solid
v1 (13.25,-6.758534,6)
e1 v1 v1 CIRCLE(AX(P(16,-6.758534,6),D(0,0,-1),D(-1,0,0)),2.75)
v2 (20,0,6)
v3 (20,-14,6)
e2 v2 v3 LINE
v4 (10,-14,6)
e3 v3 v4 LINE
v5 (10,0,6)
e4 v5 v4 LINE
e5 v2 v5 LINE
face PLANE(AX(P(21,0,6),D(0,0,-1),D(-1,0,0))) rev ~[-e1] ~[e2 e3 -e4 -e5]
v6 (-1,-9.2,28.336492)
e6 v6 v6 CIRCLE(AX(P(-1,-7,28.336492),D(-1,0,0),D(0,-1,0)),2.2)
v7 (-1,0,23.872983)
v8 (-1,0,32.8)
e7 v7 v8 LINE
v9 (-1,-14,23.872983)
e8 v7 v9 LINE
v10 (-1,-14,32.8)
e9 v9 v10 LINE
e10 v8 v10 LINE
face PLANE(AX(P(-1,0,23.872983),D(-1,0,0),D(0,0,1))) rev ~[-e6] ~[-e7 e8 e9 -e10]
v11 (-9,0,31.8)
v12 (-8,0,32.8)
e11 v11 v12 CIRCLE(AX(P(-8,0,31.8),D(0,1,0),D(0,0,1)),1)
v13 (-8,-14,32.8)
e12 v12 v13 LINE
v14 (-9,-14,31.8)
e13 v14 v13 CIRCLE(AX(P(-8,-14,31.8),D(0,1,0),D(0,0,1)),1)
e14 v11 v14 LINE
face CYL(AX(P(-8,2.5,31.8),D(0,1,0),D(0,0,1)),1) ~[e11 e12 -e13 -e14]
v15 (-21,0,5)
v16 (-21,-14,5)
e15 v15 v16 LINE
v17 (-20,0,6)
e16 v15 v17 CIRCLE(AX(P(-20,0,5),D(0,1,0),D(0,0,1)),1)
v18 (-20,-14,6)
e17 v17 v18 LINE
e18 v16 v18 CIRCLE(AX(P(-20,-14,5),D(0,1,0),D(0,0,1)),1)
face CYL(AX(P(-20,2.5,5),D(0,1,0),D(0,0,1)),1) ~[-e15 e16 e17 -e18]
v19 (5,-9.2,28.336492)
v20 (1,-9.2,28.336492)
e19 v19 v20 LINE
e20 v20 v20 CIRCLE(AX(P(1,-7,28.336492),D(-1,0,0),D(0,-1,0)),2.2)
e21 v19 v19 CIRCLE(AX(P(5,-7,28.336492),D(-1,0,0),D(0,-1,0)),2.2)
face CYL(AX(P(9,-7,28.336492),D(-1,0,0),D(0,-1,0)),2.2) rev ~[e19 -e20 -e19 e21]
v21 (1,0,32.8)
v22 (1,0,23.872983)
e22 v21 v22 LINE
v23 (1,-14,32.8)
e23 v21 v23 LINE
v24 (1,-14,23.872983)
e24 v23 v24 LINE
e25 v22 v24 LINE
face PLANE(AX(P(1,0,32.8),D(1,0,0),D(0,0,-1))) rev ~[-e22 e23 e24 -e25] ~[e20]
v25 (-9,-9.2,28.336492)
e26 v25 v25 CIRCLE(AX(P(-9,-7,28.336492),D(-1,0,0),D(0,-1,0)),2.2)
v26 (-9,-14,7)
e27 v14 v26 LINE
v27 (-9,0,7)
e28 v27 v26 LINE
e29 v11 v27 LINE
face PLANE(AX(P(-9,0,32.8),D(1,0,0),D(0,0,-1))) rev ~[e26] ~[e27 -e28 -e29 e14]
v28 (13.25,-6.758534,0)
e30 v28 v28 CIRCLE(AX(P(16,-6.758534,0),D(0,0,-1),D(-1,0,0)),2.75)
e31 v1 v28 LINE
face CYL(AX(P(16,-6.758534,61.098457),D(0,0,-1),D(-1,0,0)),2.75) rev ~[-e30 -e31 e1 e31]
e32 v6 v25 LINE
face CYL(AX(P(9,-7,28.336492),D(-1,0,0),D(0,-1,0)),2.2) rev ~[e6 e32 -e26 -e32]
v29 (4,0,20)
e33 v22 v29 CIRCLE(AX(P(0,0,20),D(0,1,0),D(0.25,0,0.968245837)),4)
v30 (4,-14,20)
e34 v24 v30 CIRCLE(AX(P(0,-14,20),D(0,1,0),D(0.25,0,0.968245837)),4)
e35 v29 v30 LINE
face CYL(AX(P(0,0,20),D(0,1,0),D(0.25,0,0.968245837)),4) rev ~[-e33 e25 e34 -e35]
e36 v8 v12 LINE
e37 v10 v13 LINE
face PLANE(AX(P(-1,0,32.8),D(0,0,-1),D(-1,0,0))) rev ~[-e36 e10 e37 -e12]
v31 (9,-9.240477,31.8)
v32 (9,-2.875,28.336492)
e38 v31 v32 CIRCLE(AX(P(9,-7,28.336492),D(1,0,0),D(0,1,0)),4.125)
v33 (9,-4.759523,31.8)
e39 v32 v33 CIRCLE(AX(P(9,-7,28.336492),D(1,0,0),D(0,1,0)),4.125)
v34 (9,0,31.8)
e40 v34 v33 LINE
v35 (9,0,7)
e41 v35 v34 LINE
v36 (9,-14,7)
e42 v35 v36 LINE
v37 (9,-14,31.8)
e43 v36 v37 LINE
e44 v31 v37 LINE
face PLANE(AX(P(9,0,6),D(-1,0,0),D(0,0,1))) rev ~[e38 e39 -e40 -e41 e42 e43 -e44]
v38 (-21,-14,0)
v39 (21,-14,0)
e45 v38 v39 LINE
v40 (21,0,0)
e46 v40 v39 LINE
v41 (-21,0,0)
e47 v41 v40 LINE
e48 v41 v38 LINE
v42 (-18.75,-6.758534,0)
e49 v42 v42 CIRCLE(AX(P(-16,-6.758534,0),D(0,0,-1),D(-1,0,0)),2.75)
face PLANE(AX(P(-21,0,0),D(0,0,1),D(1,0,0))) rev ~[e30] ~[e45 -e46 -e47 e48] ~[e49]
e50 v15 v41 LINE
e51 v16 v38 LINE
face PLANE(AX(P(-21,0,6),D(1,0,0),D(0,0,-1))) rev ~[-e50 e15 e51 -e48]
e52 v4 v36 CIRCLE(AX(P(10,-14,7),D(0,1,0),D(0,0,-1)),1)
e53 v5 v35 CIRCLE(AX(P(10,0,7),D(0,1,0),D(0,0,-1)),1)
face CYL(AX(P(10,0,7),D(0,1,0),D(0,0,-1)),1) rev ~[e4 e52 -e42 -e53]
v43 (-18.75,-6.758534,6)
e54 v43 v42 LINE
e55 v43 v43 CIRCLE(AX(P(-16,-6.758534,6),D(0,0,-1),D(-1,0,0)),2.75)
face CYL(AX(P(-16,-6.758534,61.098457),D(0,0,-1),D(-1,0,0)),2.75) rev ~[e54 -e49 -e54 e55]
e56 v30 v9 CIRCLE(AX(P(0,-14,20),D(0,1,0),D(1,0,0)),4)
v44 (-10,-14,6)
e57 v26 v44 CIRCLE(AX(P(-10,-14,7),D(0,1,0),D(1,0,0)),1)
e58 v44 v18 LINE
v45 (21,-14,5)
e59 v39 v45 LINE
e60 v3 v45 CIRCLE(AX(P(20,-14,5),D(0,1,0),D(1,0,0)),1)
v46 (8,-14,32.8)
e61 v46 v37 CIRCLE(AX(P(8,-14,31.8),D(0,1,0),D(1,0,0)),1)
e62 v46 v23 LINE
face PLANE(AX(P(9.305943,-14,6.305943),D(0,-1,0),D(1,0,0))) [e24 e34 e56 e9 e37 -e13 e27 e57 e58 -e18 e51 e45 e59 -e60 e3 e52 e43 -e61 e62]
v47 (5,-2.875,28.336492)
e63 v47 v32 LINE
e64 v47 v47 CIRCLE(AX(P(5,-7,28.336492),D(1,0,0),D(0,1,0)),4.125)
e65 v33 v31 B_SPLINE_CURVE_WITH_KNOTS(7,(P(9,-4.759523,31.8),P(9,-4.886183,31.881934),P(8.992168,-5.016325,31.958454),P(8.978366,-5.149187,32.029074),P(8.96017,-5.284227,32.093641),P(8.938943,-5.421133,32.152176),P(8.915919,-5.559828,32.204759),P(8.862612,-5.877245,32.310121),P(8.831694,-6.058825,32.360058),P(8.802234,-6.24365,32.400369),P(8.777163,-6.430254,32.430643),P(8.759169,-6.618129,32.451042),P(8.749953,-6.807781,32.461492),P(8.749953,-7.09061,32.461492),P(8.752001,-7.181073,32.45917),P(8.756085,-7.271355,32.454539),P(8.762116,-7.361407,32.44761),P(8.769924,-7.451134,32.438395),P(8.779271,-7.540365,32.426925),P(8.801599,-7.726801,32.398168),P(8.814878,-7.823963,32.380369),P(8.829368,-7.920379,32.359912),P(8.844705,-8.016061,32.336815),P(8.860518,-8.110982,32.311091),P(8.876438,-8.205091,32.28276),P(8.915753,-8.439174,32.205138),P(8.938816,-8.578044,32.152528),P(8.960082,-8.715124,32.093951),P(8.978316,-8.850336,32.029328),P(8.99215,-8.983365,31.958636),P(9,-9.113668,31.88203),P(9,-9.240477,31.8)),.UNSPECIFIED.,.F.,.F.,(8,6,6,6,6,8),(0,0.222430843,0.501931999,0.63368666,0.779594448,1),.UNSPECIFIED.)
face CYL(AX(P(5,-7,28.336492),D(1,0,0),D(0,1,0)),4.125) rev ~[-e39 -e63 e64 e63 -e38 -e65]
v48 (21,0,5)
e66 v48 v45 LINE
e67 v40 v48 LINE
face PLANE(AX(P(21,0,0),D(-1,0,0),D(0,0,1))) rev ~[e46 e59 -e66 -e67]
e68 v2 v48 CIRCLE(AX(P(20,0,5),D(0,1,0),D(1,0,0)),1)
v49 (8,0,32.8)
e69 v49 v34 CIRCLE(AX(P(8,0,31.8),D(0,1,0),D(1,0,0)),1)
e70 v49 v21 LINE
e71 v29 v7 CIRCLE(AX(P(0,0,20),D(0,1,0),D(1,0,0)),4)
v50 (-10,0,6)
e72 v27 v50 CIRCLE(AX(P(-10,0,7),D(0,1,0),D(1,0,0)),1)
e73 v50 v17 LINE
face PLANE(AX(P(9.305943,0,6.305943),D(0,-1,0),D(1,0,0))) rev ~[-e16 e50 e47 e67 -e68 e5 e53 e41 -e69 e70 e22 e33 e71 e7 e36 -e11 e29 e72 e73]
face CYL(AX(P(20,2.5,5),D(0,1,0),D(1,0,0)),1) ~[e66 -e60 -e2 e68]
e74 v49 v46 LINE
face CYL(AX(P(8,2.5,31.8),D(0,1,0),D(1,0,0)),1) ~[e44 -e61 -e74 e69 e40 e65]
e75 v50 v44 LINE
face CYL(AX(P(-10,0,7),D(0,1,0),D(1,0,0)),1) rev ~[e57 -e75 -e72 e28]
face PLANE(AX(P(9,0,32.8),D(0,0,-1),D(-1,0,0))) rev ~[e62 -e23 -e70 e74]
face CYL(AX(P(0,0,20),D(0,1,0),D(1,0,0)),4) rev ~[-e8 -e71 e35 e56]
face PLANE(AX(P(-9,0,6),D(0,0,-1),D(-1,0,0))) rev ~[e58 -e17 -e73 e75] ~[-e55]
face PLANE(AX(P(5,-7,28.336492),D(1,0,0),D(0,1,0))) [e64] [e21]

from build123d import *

# Parameters (mm, degrees)
F1_DEPTH       = 14
F3_D           = 4.4
F3_CBORE_D     = 8.25
F3_CBORE_DEPTH = 4
F4_T1_DEPTH    = 14
F4_T3_DEPTH    = 19
F6_D           = 5.5


# Not quite as in the source:
# - a fillet or chamfer that OpenCascade refuses, or shapes differently, is made with other operations: its cross-section is extruded or revolved along the edge and cut away or added


with BuildPart() as f1:
    # F0 (on Front) → F1 (new body)
    with BuildSketch(Plane.XZ):
        with BuildLine():
            Line((-21, 6), (-21, 0))
            Line((-21, 0), (21, 0))
            Line((21, 0), (21, 6))
            Line((21, 6), (9, 6))
            Line((9, 6), (9, 32.8))
            Line((9, 32.8), (1, 32.8))
            Line((1, 32.8), (1, 23.8729833462))
            ThreePointArc((1, 23.8729833462), (3.1622776602, 22.4494897428), (4, 20))
            ThreePointArc((4, 20), (-2.4494897428, 16.8377223398), (-1, 23.8729833462))
            Line((-1, 23.8729833462), (-1, 32.8))
            Line((-1, 32.8), (-9, 32.8))
            Line((-9, 32.8), (-9, 6))
            Line((-9, 6), (-21, 6))
        make_face()
    extrude(amount=F1_DEPTH)

    # F3 (through all)
    with Locations(Plane.YZ.offset(9)):
        with Locations((-7, 28.3364916731)):
            CounterBoreHole(F3_D / 2, F3_CBORE_D / 2, F3_CBORE_DEPTH)

    # F4: fillet of radius 1 on 6 edges, made by hand

    # F4_s2 → F4_t1 (join)
    with BuildSketch(Plane.XZ):
        with BuildLine():
            ThreePointArc((10, 6), (9.2928932188, 6.2928932188), (9, 7))
            Line((9, 7), (9, 6))
            Line((9, 6), (10, 6))
        make_face()
        with BuildLine():
            ThreePointArc((-9, 7), (-9.2928932188, 6.2928932188), (-10, 6))
            Line((-10, 6), (-9, 6))
            Line((-9, 6), (-9, 7))
        make_face()
    extrude(amount=F4_T1_DEPTH)

    # F4_s4 → F4_t3 (cut)
    with BuildSketch(Plane.XZ.offset(-2.5)):
        with BuildLine():
            ThreePointArc((-20, 6), (-20.7071067812, 5.7071067812), (-21, 5))
            Line((-21, 5), (-21, 6))
            Line((-21, 6), (-20, 6))
        make_face()
        with BuildLine():
            ThreePointArc((21, 5), (20.7071067812, 5.7071067812), (20, 6))
            Line((20, 6), (21, 6))
            Line((21, 6), (21, 5))
        make_face()
        with BuildLine():
            ThreePointArc((-8, 32.8), (-8.7071067812, 32.5071067812), (-9, 31.8))
            Line((-9, 31.8), (-9, 32.8))
            Line((-9, 32.8), (-8, 32.8))
        make_face()
        with BuildLine():
            ThreePointArc((9, 31.8), (8.7071067812, 32.5071067812), (8, 32.8))
            Line((8, 32.8), (9, 32.8))
            Line((9, 32.8), (9, 31.8))
        make_face()
    extrude(amount=F4_T3_DEPTH, mode=Mode.SUBTRACT)

    # F6 (through all)
    with Locations(Plane.XY.offset(6)):
        with Locations((-16, -6.7585341167), (16, -6.7585341167)):
            Hole(F6_D / 2)


solid = f1.part
